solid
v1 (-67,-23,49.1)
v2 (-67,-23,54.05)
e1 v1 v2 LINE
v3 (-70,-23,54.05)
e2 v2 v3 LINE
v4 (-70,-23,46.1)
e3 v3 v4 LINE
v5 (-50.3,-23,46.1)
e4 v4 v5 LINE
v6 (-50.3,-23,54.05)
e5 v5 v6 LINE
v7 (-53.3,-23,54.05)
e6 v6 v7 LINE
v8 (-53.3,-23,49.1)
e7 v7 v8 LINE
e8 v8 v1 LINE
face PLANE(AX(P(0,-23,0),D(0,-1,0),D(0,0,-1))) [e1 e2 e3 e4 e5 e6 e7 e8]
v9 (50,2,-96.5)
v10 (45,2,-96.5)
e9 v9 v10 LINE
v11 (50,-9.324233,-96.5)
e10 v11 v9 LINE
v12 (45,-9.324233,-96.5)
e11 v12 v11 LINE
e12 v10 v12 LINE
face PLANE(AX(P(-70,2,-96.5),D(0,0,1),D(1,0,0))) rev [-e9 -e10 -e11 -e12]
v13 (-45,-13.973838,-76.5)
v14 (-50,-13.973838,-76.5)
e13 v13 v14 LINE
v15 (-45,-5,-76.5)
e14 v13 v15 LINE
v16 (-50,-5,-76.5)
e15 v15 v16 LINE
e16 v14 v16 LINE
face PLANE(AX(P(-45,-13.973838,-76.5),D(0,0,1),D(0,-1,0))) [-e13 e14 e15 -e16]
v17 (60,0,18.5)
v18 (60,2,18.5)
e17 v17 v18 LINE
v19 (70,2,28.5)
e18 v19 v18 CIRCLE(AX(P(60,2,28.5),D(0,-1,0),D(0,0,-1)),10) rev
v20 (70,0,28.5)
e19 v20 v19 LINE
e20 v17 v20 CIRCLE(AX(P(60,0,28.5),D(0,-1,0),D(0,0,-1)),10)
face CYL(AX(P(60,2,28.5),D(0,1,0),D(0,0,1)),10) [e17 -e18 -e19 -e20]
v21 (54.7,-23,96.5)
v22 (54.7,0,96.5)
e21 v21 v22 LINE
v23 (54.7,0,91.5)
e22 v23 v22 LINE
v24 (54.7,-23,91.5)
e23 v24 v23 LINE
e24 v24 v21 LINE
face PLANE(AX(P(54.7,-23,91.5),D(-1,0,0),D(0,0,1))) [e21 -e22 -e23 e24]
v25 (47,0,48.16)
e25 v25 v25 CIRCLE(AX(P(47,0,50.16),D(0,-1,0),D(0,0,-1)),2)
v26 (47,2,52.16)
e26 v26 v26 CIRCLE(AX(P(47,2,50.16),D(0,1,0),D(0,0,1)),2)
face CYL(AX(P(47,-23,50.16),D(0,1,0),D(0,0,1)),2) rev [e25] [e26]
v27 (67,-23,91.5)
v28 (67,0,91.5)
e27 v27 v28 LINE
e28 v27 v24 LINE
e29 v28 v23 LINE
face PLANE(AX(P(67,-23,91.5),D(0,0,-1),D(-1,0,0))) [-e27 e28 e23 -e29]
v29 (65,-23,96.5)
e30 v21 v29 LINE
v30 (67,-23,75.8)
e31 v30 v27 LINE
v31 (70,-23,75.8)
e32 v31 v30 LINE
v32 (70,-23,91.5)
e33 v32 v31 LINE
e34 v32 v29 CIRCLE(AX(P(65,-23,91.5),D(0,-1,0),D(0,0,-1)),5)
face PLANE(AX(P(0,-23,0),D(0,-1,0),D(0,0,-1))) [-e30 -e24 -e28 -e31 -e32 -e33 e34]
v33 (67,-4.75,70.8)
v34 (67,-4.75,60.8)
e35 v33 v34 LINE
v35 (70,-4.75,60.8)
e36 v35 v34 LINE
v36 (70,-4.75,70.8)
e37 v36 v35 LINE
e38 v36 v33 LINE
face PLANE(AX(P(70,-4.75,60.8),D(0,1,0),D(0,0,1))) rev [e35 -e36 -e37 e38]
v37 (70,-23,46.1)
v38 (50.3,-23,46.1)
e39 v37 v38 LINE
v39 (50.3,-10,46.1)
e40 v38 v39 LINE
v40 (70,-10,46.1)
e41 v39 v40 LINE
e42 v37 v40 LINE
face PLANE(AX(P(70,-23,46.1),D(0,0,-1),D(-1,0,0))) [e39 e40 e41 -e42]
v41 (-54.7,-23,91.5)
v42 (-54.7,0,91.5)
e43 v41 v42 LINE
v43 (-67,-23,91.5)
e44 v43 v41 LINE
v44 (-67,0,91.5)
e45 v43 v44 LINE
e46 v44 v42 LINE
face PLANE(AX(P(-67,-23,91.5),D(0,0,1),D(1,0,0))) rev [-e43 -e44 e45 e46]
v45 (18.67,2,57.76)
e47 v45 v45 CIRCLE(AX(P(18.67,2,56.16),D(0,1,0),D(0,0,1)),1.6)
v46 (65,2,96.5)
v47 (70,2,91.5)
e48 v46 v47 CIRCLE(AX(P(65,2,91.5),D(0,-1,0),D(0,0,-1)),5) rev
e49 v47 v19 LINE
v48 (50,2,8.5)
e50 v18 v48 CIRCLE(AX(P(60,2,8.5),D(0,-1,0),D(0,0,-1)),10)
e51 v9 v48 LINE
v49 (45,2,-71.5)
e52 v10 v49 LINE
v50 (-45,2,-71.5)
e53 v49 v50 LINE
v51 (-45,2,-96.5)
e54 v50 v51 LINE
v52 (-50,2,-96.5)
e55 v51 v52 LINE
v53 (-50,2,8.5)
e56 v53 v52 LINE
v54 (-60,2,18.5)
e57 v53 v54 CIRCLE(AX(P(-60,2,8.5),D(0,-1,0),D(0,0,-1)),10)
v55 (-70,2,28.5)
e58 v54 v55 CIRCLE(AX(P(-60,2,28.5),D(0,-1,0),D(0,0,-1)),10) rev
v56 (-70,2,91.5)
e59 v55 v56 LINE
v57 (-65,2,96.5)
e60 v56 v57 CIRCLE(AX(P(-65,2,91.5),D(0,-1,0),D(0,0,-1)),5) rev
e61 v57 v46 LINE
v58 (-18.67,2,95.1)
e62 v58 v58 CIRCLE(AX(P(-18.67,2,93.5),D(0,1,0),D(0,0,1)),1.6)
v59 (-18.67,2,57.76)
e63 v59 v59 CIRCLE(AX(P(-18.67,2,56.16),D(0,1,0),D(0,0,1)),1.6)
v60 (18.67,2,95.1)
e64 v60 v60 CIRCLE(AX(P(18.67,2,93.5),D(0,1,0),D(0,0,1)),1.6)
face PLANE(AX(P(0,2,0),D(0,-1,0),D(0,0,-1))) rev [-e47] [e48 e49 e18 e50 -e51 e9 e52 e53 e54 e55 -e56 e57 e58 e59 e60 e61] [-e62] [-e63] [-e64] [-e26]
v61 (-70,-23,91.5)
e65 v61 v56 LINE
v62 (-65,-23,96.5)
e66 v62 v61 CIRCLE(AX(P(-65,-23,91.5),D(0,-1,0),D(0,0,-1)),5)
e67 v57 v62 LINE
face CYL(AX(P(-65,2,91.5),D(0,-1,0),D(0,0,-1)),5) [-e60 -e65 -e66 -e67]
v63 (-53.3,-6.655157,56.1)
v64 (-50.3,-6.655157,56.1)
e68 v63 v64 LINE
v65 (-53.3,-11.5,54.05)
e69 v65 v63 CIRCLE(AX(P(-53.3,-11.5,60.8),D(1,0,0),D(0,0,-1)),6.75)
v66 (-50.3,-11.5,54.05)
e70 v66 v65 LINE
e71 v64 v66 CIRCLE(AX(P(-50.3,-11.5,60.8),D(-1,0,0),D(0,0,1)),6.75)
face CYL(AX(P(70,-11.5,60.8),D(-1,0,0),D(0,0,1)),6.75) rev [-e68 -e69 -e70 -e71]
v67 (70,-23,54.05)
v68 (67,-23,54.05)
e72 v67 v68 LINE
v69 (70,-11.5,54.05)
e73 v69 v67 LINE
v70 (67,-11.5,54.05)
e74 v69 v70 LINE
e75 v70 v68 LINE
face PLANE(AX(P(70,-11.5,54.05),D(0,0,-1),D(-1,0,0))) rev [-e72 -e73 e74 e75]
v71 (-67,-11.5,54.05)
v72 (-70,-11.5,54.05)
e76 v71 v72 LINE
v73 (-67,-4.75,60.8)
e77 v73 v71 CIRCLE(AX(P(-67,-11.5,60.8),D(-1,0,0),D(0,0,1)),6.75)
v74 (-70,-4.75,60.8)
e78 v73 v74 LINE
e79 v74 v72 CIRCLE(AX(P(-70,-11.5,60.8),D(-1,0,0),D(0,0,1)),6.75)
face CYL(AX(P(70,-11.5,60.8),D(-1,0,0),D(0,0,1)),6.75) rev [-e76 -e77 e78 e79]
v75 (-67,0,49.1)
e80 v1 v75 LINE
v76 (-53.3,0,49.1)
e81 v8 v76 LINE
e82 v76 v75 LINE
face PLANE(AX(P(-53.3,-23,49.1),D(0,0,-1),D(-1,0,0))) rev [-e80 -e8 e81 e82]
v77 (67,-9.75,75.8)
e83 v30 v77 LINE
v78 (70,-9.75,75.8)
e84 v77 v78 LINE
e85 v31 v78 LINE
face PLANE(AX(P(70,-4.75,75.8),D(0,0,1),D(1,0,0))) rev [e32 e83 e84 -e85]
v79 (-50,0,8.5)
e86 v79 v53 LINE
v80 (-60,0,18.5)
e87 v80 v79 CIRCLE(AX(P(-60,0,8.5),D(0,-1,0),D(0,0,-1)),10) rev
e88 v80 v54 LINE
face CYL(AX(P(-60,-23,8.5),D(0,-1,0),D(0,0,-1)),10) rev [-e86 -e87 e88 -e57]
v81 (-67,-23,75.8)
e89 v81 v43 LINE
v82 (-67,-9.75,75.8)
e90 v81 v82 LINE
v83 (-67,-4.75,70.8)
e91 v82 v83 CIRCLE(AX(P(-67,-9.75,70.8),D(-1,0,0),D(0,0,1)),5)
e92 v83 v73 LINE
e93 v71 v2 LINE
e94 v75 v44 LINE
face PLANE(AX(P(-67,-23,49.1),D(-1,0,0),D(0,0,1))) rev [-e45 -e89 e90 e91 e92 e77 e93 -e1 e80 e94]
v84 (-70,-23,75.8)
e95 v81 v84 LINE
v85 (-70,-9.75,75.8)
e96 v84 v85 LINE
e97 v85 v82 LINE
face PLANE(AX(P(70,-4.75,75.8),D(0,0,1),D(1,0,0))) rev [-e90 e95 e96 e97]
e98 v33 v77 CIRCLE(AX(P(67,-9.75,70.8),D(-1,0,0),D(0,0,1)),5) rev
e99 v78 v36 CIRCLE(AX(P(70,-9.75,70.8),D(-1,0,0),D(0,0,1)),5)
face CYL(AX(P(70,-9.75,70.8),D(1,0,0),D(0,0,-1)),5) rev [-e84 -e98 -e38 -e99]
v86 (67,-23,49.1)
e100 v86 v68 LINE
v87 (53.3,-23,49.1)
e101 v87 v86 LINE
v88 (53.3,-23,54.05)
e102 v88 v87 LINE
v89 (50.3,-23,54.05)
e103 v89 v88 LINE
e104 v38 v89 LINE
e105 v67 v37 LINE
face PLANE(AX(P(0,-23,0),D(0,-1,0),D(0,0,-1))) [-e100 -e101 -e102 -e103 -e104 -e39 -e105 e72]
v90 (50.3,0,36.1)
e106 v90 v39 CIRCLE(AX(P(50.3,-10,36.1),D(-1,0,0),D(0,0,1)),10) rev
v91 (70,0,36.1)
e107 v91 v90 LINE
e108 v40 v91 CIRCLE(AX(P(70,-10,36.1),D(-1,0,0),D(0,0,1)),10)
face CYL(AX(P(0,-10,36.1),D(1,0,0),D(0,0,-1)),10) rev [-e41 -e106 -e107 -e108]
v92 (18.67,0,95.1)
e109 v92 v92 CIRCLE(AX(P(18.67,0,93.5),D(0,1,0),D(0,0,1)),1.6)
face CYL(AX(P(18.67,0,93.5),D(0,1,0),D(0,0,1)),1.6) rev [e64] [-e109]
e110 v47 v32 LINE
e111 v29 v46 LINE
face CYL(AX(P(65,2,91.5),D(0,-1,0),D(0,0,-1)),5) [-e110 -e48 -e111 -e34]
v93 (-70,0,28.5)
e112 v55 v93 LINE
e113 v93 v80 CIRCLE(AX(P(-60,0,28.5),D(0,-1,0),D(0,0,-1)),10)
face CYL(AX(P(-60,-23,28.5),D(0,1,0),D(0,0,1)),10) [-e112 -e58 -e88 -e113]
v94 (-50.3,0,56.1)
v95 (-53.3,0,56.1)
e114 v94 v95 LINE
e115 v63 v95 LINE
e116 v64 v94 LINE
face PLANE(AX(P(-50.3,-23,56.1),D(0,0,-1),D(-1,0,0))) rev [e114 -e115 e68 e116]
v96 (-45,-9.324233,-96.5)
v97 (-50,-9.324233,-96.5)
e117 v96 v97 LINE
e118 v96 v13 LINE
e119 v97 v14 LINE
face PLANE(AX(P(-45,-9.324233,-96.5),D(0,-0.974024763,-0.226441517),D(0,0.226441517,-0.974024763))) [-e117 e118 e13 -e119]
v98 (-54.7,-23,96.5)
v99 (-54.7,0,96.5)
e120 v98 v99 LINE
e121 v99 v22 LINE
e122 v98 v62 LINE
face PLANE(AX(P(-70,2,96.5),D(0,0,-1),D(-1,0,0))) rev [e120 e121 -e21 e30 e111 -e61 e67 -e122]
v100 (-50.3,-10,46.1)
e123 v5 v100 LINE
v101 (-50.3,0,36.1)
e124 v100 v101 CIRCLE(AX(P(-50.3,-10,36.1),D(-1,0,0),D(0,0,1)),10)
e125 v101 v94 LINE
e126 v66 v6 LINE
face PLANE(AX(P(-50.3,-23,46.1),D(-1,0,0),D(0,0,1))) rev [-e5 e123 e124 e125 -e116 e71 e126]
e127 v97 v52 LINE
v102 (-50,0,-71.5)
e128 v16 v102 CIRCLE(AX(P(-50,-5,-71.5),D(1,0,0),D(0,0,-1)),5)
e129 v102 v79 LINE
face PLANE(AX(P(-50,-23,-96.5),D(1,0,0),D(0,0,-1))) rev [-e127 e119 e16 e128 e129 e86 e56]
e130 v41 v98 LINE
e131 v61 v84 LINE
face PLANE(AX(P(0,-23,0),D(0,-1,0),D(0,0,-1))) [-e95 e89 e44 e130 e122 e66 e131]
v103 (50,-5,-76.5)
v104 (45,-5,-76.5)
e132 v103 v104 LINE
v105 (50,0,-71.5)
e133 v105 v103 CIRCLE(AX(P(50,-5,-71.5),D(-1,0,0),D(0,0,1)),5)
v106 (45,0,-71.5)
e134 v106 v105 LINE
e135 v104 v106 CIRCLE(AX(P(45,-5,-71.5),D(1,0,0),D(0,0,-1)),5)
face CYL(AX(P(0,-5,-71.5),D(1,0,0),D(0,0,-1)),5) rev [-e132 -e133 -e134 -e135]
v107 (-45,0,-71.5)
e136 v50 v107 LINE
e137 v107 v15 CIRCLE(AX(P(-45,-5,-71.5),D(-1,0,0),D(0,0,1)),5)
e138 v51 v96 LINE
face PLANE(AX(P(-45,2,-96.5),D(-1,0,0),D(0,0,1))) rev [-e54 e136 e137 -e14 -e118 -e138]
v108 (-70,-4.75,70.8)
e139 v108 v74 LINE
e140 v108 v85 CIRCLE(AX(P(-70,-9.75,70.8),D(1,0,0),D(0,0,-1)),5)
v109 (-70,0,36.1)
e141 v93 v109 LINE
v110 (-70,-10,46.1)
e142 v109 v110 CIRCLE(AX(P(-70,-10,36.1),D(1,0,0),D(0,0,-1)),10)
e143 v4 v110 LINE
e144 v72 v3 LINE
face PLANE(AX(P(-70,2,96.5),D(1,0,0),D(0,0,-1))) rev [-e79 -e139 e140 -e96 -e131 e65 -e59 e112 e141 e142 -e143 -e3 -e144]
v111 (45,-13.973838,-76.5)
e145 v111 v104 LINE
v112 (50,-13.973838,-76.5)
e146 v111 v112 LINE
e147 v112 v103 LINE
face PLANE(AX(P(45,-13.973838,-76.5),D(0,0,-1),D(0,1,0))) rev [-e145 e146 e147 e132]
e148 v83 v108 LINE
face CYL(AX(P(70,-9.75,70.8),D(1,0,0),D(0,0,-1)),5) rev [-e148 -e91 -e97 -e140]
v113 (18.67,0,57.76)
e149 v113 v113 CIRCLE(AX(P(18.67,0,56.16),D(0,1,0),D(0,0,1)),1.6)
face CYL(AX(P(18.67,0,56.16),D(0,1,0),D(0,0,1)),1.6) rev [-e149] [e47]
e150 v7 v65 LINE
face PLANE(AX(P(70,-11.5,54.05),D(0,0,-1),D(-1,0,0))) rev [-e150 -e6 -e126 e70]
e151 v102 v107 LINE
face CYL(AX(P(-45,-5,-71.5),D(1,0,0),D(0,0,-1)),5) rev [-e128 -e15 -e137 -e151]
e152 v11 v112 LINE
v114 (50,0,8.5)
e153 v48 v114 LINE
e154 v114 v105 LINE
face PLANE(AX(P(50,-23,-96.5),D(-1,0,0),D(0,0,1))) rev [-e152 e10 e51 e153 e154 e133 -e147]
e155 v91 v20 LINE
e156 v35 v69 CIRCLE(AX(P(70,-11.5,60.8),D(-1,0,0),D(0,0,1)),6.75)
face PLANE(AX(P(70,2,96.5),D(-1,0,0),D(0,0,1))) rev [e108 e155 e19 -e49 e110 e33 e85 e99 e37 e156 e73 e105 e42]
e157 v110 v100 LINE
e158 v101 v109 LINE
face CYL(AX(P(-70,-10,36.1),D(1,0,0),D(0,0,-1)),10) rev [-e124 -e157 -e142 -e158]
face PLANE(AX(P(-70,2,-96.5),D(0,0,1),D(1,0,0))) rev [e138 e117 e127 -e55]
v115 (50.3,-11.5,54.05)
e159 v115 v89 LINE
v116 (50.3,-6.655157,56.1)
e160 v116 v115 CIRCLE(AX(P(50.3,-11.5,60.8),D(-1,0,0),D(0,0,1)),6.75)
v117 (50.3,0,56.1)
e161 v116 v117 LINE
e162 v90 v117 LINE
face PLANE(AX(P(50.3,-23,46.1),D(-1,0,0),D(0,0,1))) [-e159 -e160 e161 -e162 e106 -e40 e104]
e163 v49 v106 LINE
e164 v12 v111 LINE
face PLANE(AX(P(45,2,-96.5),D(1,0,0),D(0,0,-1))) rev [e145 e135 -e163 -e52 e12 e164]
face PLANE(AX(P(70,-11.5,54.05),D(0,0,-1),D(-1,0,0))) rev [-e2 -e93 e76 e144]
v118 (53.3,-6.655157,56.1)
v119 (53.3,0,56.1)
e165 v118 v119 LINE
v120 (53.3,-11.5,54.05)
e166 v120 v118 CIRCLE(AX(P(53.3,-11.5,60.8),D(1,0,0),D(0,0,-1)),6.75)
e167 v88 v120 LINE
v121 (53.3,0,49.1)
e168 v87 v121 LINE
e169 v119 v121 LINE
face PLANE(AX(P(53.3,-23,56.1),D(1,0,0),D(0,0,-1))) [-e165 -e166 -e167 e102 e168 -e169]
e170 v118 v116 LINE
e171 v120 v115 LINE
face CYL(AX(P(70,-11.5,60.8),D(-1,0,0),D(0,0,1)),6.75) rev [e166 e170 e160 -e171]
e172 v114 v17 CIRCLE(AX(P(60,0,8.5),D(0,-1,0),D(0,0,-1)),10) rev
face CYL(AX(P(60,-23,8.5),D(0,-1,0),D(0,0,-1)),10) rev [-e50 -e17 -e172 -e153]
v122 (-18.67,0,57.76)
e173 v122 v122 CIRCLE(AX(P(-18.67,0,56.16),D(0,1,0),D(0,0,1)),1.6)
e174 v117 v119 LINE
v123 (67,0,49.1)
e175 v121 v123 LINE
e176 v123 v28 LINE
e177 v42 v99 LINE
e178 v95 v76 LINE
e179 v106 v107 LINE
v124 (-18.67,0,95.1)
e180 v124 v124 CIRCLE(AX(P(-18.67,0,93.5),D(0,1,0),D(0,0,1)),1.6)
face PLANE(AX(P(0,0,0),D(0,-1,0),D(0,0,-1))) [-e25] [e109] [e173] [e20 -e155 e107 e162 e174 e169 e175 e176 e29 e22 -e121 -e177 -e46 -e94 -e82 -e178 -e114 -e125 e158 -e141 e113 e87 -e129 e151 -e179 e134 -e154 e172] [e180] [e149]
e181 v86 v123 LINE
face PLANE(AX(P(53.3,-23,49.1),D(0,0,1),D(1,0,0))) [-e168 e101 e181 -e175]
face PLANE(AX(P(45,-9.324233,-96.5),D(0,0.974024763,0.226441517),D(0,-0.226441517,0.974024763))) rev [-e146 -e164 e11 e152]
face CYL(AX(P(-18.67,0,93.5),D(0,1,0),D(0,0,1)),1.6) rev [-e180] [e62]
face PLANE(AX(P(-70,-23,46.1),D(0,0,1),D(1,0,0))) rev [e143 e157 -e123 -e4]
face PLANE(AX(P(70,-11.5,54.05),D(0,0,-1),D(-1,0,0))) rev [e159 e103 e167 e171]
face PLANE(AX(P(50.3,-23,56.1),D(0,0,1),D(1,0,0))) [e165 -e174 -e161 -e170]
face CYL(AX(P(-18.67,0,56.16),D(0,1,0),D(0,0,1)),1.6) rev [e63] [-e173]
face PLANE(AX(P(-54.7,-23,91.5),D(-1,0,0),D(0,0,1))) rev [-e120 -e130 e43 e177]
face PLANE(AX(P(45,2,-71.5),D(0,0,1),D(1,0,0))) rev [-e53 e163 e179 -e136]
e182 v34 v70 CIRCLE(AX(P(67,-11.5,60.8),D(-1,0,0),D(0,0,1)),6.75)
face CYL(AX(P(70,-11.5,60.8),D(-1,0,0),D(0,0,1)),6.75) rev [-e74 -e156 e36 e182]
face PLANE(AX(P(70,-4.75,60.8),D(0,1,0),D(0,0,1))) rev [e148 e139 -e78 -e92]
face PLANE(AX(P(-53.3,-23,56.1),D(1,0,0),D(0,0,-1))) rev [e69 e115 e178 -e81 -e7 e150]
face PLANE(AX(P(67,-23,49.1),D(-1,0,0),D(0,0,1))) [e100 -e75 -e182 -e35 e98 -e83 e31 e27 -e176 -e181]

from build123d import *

# Parameters (mm, degrees)
SKETCH_1_W             = 140
SKETCH_1_H             = 193
EXTRUDE_1_DEPTH        = 2
SKETCH_2_R             = 1.6
CUT_EXTRUDE_1_DEPTH    = 120.231916868
EXTRUDE_2_DEPTH        = 23
CUT_EXTRUDE_2_DEPTH    = 172.584527274
FILLET_1_R             = 5
FILLET_2_R             = 10
SKETCH_5_R             = 2
CUT_EXTRUDE_3_DEPTH    = 122.808250952
FILLET_3_R             = 5
SKETCH_6_W             = 20
SKETCH_6_H             = 115
CUT_EXTRUDE_4_DEPTH    = 122.808250952
FILLET_START           = -23
FILLET_4_DEPTH         = 26
FILLET_4_2_DEPTH       = 2
SKETCH_7_W             = 90
SKETCH_7_H             = 25
CUT_EXTRUDE_5_DEPTH    = 122.413549491
EXTRUDE_5_DEPTH        = 5
FILLET_8_R             = 5
FILLET_8_OF_MIRROR_3_R = 5


with BuildPart() as part:
    # 스케치1 → 보스-돌출1 (new body)
    with BuildSketch(Plane(origin=(0, 0, 0), x_dir=(1, 0, 0), z_dir=(0, 1, 0))):
        Rectangle(SKETCH_1_W, SKETCH_1_H)
    extrude(amount=EXTRUDE_1_DEPTH)

    # 스케치2 → 컷-돌출1 (cut, through all)
    with BuildSketch(Plane(origin=(0, 2, 0), x_dir=(1, 0, 0), z_dir=(0, 1, 0))):
        with Locations(Location((-18.67, -93.5, 0), (0, 0, 270))):
            Circle(SKETCH_2_R)
        with Locations(Location((18.67, -93.5, 0), (0, 0, 270))):
            Circle(SKETCH_2_R)
        with Locations(Location((18.67, -56.16, 0), (0, 0, 270))):
            Circle(SKETCH_2_R)
        with Locations(Location((-18.67, -56.16, 0), (0, 0, 270))):
            Circle(SKETCH_2_R)
    extrude(amount=-CUT_EXTRUDE_1_DEPTH, mode=Mode.SUBTRACT)

    # 스케치3 → 보스-돌출2 (add)
    with BuildSketch(Plane(origin=(0, 0, 0), x_dir=(-1, 0, 0), z_dir=(0, -1, 0))):
        Polygon((70, -96.5), (70, -46.1), (50.3, -46.1), (50.3, -56.1), (53.3, -56.1), (53.3, -49.1), (67, -49.1), (67, -91.5), (54.7, -91.5), (54.7, -96.5), align=None)
    extrude_2 = extrude(amount=EXTRUDE_2_DEPTH)

    # 대칭 복사1: 보스-돌출2 across plane
    add(extrude_2.mirror(Plane(origin=(0, 0, 0), x_dir=(0, 0, 1), z_dir=(1, 0, 0))))

    # 스케치4 → 컷-돌출2 (cut, through all)
    with BuildSketch(Plane.ZY.offset(70)):
        with BuildLine():
            Line((54.05, -11.5), (54.05, -23))
            Line((54.05, -23), (75.8, -23))
            Line((75.8, -23), (75.8, -4.75))
            Line((75.8, -4.75), (60.8, -4.75))
            ThreePointArc((60.8, -4.75), (56.027029227, -6.727029227), (54.05, -11.5))
        make_face()
    extrude(amount=-CUT_EXTRUDE_2_DEPTH, mode=Mode.SUBTRACT)

    # 필렛1
    fillet_1_edges = [part.edges().sort_by_distance(p)[0] for p in [
        (-68.5, -4.75, 75.8),
        (68.5, -4.75, 75.8),
    ]]
    fillet(fillet_1_edges, radius=FILLET_1_R)

    # 필렛2
    fillet_2_edges = [part.edges().sort_by_distance(p)[0] for p in [
        (-60.15, 0, 46.1),
        (60.15, 0, 46.1),
    ]]
    fillet(fillet_2_edges, radius=FILLET_2_R)

    # 스케치5 → 컷-돌출3 (cut, through all)
    with BuildSketch(Plane(origin=(0, 2, 0), x_dir=(1, 0, 0), z_dir=(0, 1, 0))):
        with Locations(Location((47, -50.16, 0), (0, 0, 270))):
            Circle(SKETCH_5_R)
    extrude(amount=-CUT_EXTRUDE_3_DEPTH, mode=Mode.SUBTRACT)

    # 필렛3
    fillet_3_edges = [part.edges().sort_by_distance(p)[0] for p in [
        (70, -10.5, 96.5),
        (-70, -10.5, 96.5),
    ]]
    fillet(fillet_3_edges, radius=FILLET_3_R)

    # 스케치6 → 컷-돌출4 (cut, through all)
    with BuildSketch(Plane(origin=(0, 2, 0), x_dir=(1, 0, 0), z_dir=(0, 1, 0))):
        with Locations((-60, 39)):
            Rectangle(SKETCH_6_W, SKETCH_6_H)
        with Locations((60, 39)):
            Rectangle(SKETCH_6_W, SKETCH_6_H)
    extrude(amount=-CUT_EXTRUDE_4_DEPTH, mode=Mode.SUBTRACT)

    # 필렛4: read off the stored shape, not the designer's step
    # 필렛4 outline → 필렛4 (cut)
    with BuildSketch(Plane(origin=(0, 0, 0), x_dir=(1, 0, 0), z_dir=(0, 1, 0)).offset(FILLET_START)):
        with BuildLine():
            Line((70, -18.5), (60, -18.5))
            ThreePointArc((60, -18.5), (67.071067812, -21.428932188), (70, -28.5))
            Line((70, -28.5), (70, -18.5))
        make_face()
        with BuildLine():
            ThreePointArc((-70, -28.5), (-67.071067812, -21.428932188), (-60, -18.5))
            Line((-60, -18.5), (-70, -18.5))
            Line((-70, -18.5), (-70, -28.5))
        make_face()
    extrude(amount=FILLET_4_DEPTH, mode=Mode.SUBTRACT)

    # Fillet 4 2 outline → Fillet 4 2 (add)
    with BuildSketch(Plane(origin=(0, 0, 0), x_dir=(1, 0, 0), z_dir=(0, 1, 0))):
        with BuildLine():
            Line((50, -18.5), (60, -18.5))
            ThreePointArc((60, -18.5), (52.928932188, -15.571067812), (50, -8.5))
            Line((50, -8.5), (50, -18.5))
        make_face()
        with BuildLine():
            ThreePointArc((-50, -8.5), (-52.928932188, -15.571067812), (-60, -18.5))
            Line((-60, -18.5), (-50, -18.5))
            Line((-50, -18.5), (-50, -8.5))
        make_face()
    extrude(amount=FILLET_4_2_DEPTH)

    # 스케치7 → 컷-돌출5 (cut, through all)
    with BuildSketch(Plane.XZ):
        with Locations((0, -84)):
            Rectangle(SKETCH_7_W, SKETCH_7_H)
    extrude(amount=-CUT_EXTRUDE_5_DEPTH, mode=Mode.SUBTRACT)

    # 스케치11 → 보스-돌출5 (add)
    with BuildSketch(Plane.ZY.offset(50)):
        Polygon((-96.5, 0), (-96.5, -9.324233381), (-76.5, -13.973838302), (-76.5, 0), align=None)
    extrude_5 = extrude(amount=-EXTRUDE_5_DEPTH)

    # 필렛8
    fillet_8_edges = [part.edges().sort_by_distance(p)[0] for p in [
        (-47.5, 0, -76.5),
    ]]
    fillet(fillet_8_edges, radius=FILLET_8_R)

    # 대칭 복사3: 보스-돌출5 across plane
    add(extrude_5.mirror(Plane(origin=(0, 0, 0), x_dir=(0, 0, 1), z_dir=(1, 0, 0))))

    # 필렛8 of 대칭 복사3
    fillet_8_of_mirror_3_edges = [part.edges().sort_by_distance(p)[0] for p in [
        (47.5, 0, -76.5),
    ]]
    fillet(fillet_8_of_mirror_3_edges, radius=FILLET_8_OF_MIRROR_3_R)


solid = part.part
